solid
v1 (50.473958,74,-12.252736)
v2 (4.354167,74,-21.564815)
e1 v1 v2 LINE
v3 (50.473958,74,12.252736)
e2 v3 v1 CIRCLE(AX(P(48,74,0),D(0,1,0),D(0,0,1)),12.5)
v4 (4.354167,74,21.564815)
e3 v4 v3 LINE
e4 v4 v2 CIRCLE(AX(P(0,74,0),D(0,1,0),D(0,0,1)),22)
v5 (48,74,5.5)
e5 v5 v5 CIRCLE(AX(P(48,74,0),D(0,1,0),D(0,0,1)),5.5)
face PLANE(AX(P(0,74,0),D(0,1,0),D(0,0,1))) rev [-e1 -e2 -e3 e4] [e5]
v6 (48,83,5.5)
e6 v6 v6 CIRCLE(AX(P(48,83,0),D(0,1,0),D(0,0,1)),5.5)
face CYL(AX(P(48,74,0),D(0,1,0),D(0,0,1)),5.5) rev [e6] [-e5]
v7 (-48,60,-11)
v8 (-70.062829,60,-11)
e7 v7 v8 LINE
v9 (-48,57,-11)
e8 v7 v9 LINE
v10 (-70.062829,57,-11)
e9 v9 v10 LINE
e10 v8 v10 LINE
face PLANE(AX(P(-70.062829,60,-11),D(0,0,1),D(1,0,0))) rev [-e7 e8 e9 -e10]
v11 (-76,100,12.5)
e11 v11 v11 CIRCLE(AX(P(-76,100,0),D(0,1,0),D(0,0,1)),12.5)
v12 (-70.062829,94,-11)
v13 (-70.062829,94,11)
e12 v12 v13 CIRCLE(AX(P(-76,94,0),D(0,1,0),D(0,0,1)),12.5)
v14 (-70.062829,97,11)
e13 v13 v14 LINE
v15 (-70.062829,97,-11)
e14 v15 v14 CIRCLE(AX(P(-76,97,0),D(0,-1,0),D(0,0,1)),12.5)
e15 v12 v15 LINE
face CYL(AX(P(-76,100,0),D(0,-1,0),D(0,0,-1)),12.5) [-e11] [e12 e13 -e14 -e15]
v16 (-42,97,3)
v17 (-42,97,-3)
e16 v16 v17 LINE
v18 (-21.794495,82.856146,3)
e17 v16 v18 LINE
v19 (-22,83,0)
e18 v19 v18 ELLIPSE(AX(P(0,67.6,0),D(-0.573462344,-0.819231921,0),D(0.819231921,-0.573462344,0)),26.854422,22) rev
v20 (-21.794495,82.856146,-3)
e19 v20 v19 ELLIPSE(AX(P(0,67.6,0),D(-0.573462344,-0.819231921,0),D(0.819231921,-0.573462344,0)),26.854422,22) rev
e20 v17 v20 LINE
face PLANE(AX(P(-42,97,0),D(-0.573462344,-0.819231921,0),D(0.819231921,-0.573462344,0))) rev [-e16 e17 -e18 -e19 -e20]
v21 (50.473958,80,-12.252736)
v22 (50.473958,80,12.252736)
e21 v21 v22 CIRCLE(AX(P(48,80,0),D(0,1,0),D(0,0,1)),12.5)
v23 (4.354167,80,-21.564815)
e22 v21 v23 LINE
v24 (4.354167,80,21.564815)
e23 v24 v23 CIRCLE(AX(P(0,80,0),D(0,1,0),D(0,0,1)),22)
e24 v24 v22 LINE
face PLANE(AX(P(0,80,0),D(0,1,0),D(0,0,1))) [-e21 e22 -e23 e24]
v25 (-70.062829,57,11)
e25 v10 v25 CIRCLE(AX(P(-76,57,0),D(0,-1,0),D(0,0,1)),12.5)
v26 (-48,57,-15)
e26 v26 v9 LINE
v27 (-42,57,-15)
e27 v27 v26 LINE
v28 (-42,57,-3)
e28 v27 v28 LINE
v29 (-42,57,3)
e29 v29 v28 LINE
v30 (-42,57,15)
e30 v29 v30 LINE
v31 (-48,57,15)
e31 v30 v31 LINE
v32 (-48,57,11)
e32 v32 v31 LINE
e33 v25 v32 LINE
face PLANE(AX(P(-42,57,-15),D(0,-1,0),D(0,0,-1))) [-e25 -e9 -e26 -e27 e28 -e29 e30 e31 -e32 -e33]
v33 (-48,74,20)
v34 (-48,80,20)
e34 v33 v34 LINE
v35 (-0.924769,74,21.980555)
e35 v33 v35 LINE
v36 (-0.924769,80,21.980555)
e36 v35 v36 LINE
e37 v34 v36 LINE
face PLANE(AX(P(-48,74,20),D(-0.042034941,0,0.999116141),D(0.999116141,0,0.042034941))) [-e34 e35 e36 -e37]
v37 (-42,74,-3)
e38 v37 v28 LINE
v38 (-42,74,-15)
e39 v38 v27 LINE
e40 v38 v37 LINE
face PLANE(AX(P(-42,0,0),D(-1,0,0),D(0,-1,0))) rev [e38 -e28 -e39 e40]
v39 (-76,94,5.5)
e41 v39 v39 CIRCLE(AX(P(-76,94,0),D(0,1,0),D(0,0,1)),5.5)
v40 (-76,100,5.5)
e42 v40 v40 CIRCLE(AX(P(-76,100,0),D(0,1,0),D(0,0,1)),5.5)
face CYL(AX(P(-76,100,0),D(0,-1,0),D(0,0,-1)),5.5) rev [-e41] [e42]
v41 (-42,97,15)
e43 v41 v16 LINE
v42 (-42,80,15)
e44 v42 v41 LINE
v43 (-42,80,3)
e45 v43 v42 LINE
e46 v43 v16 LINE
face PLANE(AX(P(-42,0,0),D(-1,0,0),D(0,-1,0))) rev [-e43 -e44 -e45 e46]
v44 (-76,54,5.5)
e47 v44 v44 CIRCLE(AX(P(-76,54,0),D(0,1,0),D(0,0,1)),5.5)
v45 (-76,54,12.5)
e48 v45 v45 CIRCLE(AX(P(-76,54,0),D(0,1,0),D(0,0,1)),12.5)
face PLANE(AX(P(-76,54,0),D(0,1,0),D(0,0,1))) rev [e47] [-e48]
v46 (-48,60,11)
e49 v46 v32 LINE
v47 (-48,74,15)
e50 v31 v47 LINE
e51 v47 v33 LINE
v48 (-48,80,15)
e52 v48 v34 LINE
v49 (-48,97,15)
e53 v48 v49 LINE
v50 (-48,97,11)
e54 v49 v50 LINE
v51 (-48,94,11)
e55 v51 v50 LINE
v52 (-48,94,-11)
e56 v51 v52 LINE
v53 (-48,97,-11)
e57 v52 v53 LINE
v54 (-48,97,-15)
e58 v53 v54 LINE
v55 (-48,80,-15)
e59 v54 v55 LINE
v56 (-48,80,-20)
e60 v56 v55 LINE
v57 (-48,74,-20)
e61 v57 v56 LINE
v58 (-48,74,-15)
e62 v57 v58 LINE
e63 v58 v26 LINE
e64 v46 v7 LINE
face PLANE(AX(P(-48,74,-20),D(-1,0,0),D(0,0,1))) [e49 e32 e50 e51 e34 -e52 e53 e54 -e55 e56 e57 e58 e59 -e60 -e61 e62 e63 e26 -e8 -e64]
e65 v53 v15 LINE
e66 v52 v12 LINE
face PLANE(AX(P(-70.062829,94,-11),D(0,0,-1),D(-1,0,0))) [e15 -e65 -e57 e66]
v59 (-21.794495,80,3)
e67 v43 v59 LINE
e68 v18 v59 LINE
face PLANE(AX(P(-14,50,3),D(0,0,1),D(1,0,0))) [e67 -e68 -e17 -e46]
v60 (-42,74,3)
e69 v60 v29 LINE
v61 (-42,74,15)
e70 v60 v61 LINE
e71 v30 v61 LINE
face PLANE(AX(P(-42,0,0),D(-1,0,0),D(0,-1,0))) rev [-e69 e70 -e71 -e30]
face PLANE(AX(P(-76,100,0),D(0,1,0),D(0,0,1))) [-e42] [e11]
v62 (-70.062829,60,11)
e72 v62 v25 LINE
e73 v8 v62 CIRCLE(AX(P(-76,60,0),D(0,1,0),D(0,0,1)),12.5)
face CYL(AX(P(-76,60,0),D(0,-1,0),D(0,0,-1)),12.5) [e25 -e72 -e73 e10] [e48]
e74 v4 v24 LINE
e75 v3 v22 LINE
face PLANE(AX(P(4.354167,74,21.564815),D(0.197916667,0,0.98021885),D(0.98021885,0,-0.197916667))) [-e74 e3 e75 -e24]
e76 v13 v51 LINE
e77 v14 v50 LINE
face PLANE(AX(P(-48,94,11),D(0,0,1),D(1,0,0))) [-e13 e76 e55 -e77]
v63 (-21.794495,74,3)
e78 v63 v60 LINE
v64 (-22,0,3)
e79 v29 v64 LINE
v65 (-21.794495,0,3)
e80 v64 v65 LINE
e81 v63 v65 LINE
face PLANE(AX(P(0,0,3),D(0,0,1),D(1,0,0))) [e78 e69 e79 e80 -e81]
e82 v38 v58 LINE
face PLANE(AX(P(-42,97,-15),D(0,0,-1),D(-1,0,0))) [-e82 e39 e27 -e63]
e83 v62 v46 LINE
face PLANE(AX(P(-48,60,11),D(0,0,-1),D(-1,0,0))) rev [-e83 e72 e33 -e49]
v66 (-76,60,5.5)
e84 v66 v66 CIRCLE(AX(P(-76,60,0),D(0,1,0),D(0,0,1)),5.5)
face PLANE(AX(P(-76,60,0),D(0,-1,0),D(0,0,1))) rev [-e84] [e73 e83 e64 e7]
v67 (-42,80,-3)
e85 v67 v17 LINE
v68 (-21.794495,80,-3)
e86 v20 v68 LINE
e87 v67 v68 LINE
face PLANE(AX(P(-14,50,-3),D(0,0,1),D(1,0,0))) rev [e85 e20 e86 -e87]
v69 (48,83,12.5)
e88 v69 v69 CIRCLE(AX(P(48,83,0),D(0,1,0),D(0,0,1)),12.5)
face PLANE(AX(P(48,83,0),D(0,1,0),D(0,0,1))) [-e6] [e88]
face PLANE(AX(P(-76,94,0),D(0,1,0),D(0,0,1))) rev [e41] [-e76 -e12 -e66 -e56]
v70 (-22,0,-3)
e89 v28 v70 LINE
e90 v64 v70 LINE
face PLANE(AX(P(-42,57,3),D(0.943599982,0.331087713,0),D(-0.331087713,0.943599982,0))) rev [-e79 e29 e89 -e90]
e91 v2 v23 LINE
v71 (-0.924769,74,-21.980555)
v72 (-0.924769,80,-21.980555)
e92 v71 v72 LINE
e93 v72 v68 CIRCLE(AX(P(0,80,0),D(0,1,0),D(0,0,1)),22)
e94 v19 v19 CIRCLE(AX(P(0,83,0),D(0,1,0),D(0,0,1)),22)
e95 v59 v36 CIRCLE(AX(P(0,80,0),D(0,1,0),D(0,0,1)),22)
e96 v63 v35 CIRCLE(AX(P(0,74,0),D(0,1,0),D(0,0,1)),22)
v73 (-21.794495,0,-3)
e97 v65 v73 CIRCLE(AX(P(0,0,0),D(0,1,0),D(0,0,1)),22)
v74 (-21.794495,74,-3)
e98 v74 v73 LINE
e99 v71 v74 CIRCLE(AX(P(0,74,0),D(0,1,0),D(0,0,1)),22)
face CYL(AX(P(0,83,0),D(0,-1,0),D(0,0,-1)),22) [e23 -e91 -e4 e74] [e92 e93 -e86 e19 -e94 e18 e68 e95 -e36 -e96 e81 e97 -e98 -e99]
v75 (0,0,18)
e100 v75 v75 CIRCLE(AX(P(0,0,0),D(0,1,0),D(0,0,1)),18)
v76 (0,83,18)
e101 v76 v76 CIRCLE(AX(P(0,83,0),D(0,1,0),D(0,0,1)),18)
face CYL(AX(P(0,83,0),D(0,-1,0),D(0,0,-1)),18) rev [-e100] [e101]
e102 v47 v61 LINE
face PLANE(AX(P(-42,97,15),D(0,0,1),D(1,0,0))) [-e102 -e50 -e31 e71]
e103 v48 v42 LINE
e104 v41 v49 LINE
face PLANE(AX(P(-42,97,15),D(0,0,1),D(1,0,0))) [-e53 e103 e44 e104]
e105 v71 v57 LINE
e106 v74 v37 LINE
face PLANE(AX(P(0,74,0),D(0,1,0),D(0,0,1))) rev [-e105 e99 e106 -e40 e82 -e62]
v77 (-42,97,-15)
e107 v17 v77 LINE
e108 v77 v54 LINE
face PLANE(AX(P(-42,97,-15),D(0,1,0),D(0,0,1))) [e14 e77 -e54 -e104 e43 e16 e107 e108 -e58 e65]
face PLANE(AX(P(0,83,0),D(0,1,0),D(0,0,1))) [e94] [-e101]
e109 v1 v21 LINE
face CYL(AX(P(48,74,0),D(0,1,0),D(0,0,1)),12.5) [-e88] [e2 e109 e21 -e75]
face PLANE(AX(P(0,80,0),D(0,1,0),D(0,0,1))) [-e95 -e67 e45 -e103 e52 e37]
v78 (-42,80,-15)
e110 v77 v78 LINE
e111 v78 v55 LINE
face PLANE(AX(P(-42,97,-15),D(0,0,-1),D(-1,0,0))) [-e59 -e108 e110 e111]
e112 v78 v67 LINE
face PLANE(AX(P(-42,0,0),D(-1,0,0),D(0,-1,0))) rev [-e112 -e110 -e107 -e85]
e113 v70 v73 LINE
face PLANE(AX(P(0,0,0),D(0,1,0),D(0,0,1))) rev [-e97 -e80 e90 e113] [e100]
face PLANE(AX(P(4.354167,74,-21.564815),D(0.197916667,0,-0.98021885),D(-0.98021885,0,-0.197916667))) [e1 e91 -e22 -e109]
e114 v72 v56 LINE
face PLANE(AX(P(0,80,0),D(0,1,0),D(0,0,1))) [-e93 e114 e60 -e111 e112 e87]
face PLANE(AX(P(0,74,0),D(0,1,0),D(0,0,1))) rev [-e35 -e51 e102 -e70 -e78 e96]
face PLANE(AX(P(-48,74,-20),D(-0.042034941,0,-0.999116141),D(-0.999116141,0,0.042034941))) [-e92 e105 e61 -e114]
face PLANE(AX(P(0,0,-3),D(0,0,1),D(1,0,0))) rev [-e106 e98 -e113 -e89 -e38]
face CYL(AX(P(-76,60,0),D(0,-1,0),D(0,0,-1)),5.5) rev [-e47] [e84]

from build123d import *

# Parameters (mm, degrees)
SKETCH1_R            = 22
SKETCH1_R_2          = 18
BOSS_EXTRUDE1_DEPTH  = 83
BOSS_EXTRUDE2_START  = -9
SKETCH2_R            = 18
SKETCH2_R_2          = 5.5
BOSS_EXTRUDE2_DEPTH  = 6
SKETCH6_W            = 30
SKETCH6_H            = 40
BOSS_EXTRUDE5_DEPTH  = 6
BOSS_EXTRUDE6_START  = -3
SKETCH7_R            = 12.5
SKETCH7_R_2          = 5.5
BOSS_EXTRUDE6_DEPTH  = 6
BOSS_EXTRUDE7_DEPTH  = 3
BOSS_EXTRUDE8_START  = -6
SKETCH9_R            = 12.5
SKETCH9_R_2          = 5.5
BOSS_EXTRUDE8_DEPTH  = 6
RIB1_REACH           = 137.338
SKETCH10_WALL_W      = 297.088193202
SKETCH10_WALL_H      = 6
BOSS_EXTRUDE10_DEPTH = 3
SKETCH12_R           = 12.5
SKETCH12_R_2         = 5.5
BOSS_EXTRUDE11_DEPTH = 3


with BuildPart() as part:
    # Sketch1 → Boss-Extrude1 (new body)
    with BuildSketch(Plane(origin=(0, 0, 0), x_dir=(1, 0, 0), z_dir=(0, 1, 0))):
        Circle(SKETCH1_R)
        Circle(SKETCH1_R_2, mode=Mode.SUBTRACT)
    extrude(amount=BOSS_EXTRUDE1_DEPTH)

    # Sketch2 → Boss-Extrude2 (add)
    with BuildSketch(Plane(origin=(0, 83, 0), x_dir=(1, 0, 0), z_dir=(0, 1, 0)).offset(BOSS_EXTRUDE2_START)):
        with BuildLine():
            Line((-48, 20), (-48, -20))
            Line((-48, -20), (-0.924768705, -21.980555108))
            ThreePointArc((-0.924768705, -21.980555108), (1.727252911, -21.932090584), (4.354166667, -21.564814691))
            Line((4.354166667, -21.564814691), (50.473958333, -12.25273562))
            ThreePointArc((50.473958333, -12.25273562), (60.5, 0), (50.473958333, 12.25273562))
            Line((50.473958333, 12.25273562), (4.354166667, 21.564814691))
            ThreePointArc((4.354166667, 21.564814691), (1.727252911, 21.932090584), (-0.924768705, 21.980555108))
            Line((-0.924768705, 21.980555108), (-48, 20))
        make_face()
        Circle(SKETCH2_R, mode=Mode.SUBTRACT)
        with Locations((48, 0)):
            Circle(SKETCH2_R_2, mode=Mode.SUBTRACT)
    extrude(amount=BOSS_EXTRUDE2_DEPTH)

    # Sketch6 → Boss-Extrude5 (add)
    with BuildSketch(Plane.ZY.offset(48)):
        with Locations((0, 77)):
            Rectangle(SKETCH6_W, SKETCH6_H)
    extrude(amount=-BOSS_EXTRUDE5_DEPTH)



with BuildPart() as body_2:
    # Sketch7 → Boss-Extrude6 (new body)
    with BuildSketch(Plane(origin=(0, 97, 0), x_dir=(1, 0, 0), z_dir=(0, 1, 0)).offset(BOSS_EXTRUDE6_START)):
        with Locations((-76, 0)):
            Circle(SKETCH7_R)
        with Locations((-76, 0)):
            Circle(SKETCH7_R_2, mode=Mode.SUBTRACT)
    extrude(amount=BOSS_EXTRUDE6_DEPTH)


with BuildPart() as part_1:
    add(part.part)

    add(body_2.part)  # Boss-Extrude7 merges body 2
    # Sketch8 → Boss-Extrude7 (add)
    with BuildSketch(Plane(origin=(0, 97, 0), x_dir=(1, 0, 0), z_dir=(0, 1, 0))):
        with BuildLine():
            Line((-70.062828956, 11), (-48, 11))
            Line((-48, 11), (-48, -11))
            Line((-48, -11), (-70.062828956, -11))
            ThreePointArc((-70.062828956, -11), (-63.5, 0), (-70.062828956, 11))
        make_face()
    boss_extrude7 = extrude(amount=-BOSS_EXTRUDE7_DEPTH)

    # Mirror3: Boss-Extrude7 across plane
    add(boss_extrude7.mirror(Plane.ZX.offset(77)))

    # Sketch9 → Boss-Extrude8 (add)
    with BuildSketch(Plane(origin=(0, 60, 0), x_dir=(1, 0, 0), z_dir=(0, 1, 0)).offset(BOSS_EXTRUDE8_START)):
        with Locations((-76, 0)):
            Circle(SKETCH9_R)
        with Locations((-76, 0)):
            Circle(SKETCH9_R_2, mode=Mode.SUBTRACT)
    extrude(amount=BOSS_EXTRUDE8_DEPTH)

    # Sketch10 wall → Rib1 (add, up to next)
    with BuildSketch(Plane(origin=(-32, 90, 0), x_dir=(0.819231920519, -0.573462344363, 0), z_dir=(0.573462344363, 0.819231920519, 0)), mode=Mode.PRIVATE) as rib1_sk1:
        Rectangle(SKETCH10_WALL_W, SKETCH10_WALL_H)
    rib1_tool1 = extrude(rib1_sk1.sketch, amount=-RIB1_REACH, mode=Mode.PRIVATE) - part_1.part
    add(rib1_tool1.solids().sort_by_distance((-32, 90, 0))[0])

    # Sketch11 → Boss-Extrude10 (add, symmetric)
    with BuildSketch(Plane.XY):
        Polygon((-42, 57), (-22, 0), (-20, 0), (-20, 74), (-42, 74), align=None)
    extrude(amount=BOSS_EXTRUDE10_DEPTH, both=True)

    # Sketch12 → Boss-Extrude11 (add)
    with BuildSketch(Plane(origin=(0, 80, 0), x_dir=(1, 0, 0), z_dir=(0, 1, 0))):
        with Locations((48, 0)):
            Circle(SKETCH12_R)
        with Locations((48, 0)):
            Circle(SKETCH12_R_2, mode=Mode.SUBTRACT)
    extrude(amount=BOSS_EXTRUDE11_DEPTH)


solid = part_1.part
